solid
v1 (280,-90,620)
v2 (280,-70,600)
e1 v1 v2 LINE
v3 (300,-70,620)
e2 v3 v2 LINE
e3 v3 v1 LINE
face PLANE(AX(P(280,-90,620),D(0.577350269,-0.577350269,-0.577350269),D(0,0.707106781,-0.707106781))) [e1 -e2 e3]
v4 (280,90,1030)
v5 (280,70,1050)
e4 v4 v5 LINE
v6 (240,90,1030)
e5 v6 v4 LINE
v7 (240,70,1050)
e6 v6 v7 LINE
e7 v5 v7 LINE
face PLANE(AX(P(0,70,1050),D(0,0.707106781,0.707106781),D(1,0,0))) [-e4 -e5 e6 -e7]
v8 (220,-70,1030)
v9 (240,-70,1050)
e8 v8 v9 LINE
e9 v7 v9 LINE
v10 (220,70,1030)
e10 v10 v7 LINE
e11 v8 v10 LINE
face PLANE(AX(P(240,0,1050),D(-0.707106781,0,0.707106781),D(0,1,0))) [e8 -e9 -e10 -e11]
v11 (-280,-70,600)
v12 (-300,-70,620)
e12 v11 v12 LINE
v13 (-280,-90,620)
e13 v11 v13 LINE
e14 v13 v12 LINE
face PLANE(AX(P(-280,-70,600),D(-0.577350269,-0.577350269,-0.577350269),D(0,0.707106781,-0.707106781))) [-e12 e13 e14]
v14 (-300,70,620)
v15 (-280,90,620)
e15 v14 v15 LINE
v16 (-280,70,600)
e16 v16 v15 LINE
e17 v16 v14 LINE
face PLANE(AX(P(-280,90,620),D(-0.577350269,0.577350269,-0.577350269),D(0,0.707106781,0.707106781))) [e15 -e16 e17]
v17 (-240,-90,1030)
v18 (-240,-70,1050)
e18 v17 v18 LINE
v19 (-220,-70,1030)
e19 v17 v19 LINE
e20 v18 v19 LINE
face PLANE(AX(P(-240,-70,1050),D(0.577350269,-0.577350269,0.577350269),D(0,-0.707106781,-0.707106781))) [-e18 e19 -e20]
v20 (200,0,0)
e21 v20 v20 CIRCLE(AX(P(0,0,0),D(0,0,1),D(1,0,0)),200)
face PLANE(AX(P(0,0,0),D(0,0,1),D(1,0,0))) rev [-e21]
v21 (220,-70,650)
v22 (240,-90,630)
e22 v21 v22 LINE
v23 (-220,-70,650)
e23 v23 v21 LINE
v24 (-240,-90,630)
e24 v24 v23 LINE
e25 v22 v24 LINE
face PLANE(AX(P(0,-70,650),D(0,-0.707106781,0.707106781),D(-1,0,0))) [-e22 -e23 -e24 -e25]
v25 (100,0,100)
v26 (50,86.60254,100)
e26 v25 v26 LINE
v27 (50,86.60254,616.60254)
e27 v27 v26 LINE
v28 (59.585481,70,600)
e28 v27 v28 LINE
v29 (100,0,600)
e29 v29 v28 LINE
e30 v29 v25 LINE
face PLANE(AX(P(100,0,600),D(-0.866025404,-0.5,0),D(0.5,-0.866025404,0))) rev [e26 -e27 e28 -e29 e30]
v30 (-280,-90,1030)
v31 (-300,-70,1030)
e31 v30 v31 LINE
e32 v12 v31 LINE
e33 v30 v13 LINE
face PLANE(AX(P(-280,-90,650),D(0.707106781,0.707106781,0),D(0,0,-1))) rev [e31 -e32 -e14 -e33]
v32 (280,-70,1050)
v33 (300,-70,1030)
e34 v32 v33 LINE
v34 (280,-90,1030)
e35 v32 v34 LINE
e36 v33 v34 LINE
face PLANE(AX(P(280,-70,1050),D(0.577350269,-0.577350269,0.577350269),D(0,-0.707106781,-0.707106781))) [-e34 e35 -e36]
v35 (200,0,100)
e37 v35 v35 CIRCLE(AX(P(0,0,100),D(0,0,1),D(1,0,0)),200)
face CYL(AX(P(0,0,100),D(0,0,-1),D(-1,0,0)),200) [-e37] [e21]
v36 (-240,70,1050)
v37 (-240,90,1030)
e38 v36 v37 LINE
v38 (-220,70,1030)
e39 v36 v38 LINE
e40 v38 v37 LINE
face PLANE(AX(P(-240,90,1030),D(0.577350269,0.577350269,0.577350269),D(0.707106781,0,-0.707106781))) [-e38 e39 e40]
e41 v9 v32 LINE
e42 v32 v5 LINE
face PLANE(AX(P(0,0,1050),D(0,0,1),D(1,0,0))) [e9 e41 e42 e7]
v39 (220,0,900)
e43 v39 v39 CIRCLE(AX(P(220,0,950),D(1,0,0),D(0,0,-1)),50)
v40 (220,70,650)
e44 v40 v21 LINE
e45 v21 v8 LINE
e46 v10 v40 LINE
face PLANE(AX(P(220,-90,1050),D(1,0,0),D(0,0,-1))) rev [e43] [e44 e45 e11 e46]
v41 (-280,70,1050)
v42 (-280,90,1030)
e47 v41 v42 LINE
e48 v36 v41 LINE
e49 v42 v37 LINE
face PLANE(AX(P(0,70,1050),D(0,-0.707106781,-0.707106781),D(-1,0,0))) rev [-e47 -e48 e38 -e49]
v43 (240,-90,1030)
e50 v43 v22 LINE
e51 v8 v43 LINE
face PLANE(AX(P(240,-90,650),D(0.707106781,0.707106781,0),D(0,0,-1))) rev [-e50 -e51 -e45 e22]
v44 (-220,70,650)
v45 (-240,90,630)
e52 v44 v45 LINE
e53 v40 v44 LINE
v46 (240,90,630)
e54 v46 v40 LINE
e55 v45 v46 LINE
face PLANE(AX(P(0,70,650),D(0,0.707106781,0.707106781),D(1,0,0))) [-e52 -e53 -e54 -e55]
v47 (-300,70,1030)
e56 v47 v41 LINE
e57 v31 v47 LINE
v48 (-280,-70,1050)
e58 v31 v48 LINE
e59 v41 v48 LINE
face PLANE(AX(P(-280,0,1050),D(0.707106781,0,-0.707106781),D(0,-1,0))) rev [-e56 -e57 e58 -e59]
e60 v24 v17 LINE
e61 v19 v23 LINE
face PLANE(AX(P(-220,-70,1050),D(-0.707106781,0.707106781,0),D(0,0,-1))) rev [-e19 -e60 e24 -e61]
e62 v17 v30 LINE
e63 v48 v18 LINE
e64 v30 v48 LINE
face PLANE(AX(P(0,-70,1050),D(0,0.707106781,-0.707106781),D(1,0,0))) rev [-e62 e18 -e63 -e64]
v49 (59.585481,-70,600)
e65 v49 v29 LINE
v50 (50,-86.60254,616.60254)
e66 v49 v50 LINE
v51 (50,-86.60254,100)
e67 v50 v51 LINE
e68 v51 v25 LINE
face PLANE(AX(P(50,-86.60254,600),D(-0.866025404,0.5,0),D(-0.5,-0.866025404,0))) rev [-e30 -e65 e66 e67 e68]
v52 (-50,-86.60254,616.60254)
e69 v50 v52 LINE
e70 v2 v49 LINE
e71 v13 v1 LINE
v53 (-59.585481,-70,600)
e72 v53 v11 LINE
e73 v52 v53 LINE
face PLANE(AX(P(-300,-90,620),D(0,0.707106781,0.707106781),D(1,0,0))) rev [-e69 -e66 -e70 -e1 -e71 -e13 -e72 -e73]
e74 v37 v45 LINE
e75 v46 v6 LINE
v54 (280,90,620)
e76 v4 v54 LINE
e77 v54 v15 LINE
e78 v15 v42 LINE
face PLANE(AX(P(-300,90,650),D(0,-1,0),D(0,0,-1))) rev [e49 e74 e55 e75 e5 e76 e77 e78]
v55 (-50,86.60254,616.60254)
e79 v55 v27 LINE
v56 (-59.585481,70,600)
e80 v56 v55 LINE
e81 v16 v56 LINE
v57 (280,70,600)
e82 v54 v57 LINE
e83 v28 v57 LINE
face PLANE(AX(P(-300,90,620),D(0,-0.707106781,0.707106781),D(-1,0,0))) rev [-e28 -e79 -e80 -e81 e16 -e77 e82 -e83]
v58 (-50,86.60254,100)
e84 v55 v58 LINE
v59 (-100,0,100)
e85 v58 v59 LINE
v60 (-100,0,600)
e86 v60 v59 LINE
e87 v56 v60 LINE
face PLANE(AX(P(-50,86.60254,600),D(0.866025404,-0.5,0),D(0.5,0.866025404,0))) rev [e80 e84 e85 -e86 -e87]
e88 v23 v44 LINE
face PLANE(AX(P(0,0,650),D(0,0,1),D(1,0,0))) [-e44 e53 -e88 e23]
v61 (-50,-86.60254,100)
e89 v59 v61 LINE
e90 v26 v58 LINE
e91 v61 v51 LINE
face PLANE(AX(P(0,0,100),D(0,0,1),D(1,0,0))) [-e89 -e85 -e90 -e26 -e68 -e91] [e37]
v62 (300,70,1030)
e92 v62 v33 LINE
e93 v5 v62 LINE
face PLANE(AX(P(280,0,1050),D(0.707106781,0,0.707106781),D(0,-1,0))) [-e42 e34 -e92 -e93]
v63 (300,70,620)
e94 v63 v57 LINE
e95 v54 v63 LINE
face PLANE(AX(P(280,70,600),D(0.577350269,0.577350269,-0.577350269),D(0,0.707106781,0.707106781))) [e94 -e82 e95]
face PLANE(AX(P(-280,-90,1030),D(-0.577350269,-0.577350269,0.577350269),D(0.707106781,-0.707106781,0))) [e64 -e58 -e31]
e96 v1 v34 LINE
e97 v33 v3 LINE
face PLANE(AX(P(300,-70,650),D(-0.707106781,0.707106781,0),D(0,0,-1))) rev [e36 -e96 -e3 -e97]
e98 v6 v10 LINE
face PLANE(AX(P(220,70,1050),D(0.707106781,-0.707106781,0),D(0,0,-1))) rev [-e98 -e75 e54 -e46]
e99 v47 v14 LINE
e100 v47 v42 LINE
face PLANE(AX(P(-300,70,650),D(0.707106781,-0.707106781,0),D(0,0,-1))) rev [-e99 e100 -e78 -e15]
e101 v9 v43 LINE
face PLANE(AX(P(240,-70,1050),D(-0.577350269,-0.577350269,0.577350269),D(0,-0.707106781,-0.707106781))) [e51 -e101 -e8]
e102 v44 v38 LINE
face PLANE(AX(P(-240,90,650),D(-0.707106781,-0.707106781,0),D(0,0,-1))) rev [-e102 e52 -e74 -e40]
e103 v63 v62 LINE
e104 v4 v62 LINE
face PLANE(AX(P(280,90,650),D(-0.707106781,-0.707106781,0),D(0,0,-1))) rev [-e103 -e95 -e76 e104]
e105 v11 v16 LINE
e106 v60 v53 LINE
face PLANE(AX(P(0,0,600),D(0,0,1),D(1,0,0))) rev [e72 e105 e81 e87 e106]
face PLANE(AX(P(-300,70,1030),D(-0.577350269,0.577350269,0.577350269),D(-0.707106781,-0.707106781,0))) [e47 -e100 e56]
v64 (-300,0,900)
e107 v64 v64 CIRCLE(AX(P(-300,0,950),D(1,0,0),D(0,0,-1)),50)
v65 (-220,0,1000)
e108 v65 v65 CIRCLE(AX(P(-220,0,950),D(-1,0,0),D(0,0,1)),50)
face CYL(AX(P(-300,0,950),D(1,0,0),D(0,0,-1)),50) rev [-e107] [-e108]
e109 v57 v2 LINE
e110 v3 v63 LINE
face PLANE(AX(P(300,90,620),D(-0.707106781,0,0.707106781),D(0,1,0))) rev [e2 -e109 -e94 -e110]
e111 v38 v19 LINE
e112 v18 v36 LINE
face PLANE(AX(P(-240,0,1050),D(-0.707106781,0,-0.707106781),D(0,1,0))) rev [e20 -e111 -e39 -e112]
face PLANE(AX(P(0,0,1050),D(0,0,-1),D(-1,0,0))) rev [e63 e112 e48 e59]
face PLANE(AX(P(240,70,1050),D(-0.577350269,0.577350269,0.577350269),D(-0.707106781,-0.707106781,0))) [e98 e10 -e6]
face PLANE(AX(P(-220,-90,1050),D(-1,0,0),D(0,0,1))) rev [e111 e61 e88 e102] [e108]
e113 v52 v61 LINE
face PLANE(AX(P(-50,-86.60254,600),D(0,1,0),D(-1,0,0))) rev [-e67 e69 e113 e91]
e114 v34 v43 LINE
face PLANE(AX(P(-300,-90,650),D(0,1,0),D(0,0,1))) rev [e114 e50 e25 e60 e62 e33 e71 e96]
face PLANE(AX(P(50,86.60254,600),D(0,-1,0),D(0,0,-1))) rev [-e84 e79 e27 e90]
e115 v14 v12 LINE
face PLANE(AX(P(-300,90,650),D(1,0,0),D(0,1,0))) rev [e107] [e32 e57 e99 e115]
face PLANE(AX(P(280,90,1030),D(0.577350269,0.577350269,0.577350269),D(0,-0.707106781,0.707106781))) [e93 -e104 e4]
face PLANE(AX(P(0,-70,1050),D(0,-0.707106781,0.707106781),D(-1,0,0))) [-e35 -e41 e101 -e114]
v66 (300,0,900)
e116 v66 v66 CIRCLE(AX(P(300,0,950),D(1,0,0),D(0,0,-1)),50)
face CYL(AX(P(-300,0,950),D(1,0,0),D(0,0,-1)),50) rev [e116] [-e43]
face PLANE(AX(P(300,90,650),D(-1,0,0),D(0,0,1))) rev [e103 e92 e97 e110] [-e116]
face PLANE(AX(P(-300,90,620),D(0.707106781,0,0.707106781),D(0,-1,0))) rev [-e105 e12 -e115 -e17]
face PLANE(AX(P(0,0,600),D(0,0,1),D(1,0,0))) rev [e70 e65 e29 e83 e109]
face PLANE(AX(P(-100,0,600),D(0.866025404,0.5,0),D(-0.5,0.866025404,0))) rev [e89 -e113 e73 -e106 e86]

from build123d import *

# Parameters (mm, degrees)
CROQUIS1_R              = 200
SALIENTE_EXTRUIR1_DEPTH = 100
SALIENTE_EXTRUIR2_DEPTH = 500
CROQUIS3_W              = 600
CROQUIS3_H              = 180
SALIENTE_EXTRUIR3_DEPTH = 50
CROQUIS4_W              = 80
CROQUIS4_H              = 180
SALIENTE_EXTRUIR4_DEPTH = 400
CROQUIS5_R              = 50
CORTAR_EXTRUIR1_DEPTH   = 1226.765067213


with BuildPart() as part:
    # Croquis1 → Saliente-Extruir1 (new body)
    with BuildSketch(Plane.XY):
        Circle(CROQUIS1_R)
    extrude(amount=SALIENTE_EXTRUIR1_DEPTH)

    # Croquis2 → Saliente-Extruir2 (add)
    with BuildSketch(Plane.XY.offset(100)):
        Polygon((100, 0), (50, 86.602540378), (-50, 86.602540378), (-100, 0), (-50, -86.602540378), (50, -86.602540378), align=None)
    extrude(amount=SALIENTE_EXTRUIR2_DEPTH)

    # Croquis3 → Saliente-Extruir3 (add)
    with BuildSketch(Plane.XY.offset(600)):
        Rectangle(CROQUIS3_W, CROQUIS3_H)
    extrude(amount=SALIENTE_EXTRUIR3_DEPTH)

    # Croquis4 → Saliente-Extruir4 (add)
    with BuildSketch(Plane.XY.offset(650)):
        with Locations((-260, 0)):
            Rectangle(CROQUIS4_W, CROQUIS4_H)
        with Locations((260, 0)):
            Rectangle(CROQUIS4_W, CROQUIS4_H)
    extrude(amount=SALIENTE_EXTRUIR4_DEPTH)

    # Chaflán1
    # the kernel refuses this chamfer: 20 mm, written as the material it takes off along each edge
    with BuildSketch(Plane(origin=(-233.333333333, 76.666666667, 1036.666666667), x_dir=(0.7071067811865475, -0.7071067811865475, 0), z_dir=(0.5773502691896257, 0.5773502691896257, 0.5773502691896257)), Plane(origin=(-286.666666667, 76.666666667, 1036.666666667), x_dir=(0, -0.7071067811865475, 0.7071067811865475), z_dir=(-0.577350269189627, 0.5773502691896253, 0.5773502691896253)), Plane(origin=(-286.666666667, -76.666666667, 613.333333333), x_dir=(-0.7071067811865475, 0, 0.7071067811865475), z_dir=(-0.5773502691896257, -0.5773502691896257, -0.5773502691896257)), Plane(origin=(286.666666667, 76.666666667, 1036.666666667), x_dir=(0.7071067811865466, -0.7071067811865486, 0), z_dir=(0.5773502691896264, 0.5773502691896247, 0.5773502691896264)), Plane(origin=(286.666666667, 76.666666667, 613.333333333), x_dir=(-2.009718347115232e-15, -0.7071067811865475, -0.7071067811865475), z_dir=(0.5773502691896264, 0.5773502691896247, -0.5773502691896264)), Plane(origin=(286.666666667, -76.666666667, 613.333333333), x_dir=(0, -0.7071067811865475, 0.7071067811865475), z_dir=(0.5773502691896257, -0.5773502691896257, -0.5773502691896257)), Plane(origin=(233.333333333, 76.666666667, 1036.666666667), x_dir=(1.004859173557616e-15, -0.7071067811865475, 0.7071067811865475), z_dir=(-0.5773502691896263, 0.5773502691896251, 0.5773502691896258))) as chafl_n1_piece_1:
        Polygon((-14.142135624, 8.164965809), (14.142135624, 8.164965809), (0, -16.329931619), align=None)
    extrude(amount=25.403411844, mode=Mode.SUBTRACT)
    with BuildSketch(Plane(origin=(233.333333333, -76.666666667, 1036.666666667), x_dir=(0, 0.7071067811865472, 0.7071067811865478), z_dir=(-0.5773502691896256, -0.5773502691896261, 0.5773502691896256)), Plane(origin=(-233.333333333, -76.666666667, 1036.666666667), x_dir=(-0.7071067811865475, 0, 0.7071067811865475), z_dir=(0.5773502691896255, -0.5773502691896263, 0.5773502691896255)), Plane(origin=(-286.666666667, 76.666666667, 613.333333333), x_dir=(0, -0.7071067811865475, -0.7071067811865475), z_dir=(-0.5773502691896257, 0.5773502691896257, -0.5773502691896257)), Plane(origin=(-286.666666667, -76.666666667, 1036.666666667), x_dir=(-0.7071067811865475, 0, -0.7071067811865475), z_dir=(-0.5773502691896257, -0.5773502691896257, 0.5773502691896257)), Plane(origin=(286.666666667, -76.666666667, 1036.666666667), x_dir=(0.7071067811865475, 0.7071067811865475, 0), z_dir=(0.5773502691896257, -0.5773502691896257, 0.5773502691896257))) as chafl_n1_piece_2:
        Polygon((-14.142135624, -8.164965809), (14.142135624, -8.164965809), (0, 16.329931619), align=None)
    extrude(amount=25.403411844, mode=Mode.SUBTRACT)
    with BuildSketch(Plane(origin=(-220, 90, 650), x_dir=(-0.9996219169112968, 0.027495876610586317, 0), z_dir=(0, 0, 1)), Plane(origin=(220, -90, 650), x_dir=(0.9996219169112968, -0.027495876610585626, 0), z_dir=(0, 0, 1))) as chafl_n1_piece_3:
        with BuildLine():
            Line((20.573463904, 0), (-1.130943098, 20.54235587))
            Line((-1.130943098, 20.54235587), (-1.530791864, 20.53135752))
            ThreePointArc((-1.530791864, 20.53135752), (-0.682584541, 10.267956593), (-0.399848767, -0.010998351))
            Line((-0.399848767, -0.010998351), (0.010998351, -0.399848767))
            ThreePointArc((0.010998351, -0.399848767), (10.289953294, -0.117112992), (20.584462254, -0.399848767))
            Line((20.584462254, -0.399848767), (20.573463904, 0))
        make_face()
    extrude(amount=451.433659759, mode=Mode.SUBTRACT)
    with BuildSketch(Plane(origin=(-220, -90, 650), x_dir=(-0.9996219169112968, -0.027495876610586282, 0), z_dir=(0, 0, 1)), Plane(origin=(220, 90, 650), x_dir=(0.9996219169112968, 0.027495876610586355, 0), z_dir=(0, 0, 1))) as chafl_n1_piece_4:
        with BuildLine():
            Line((20.573463904, 0), (-1.130943098, -20.54235587))
            Line((-1.130943098, -20.54235587), (-1.530791864, -20.53135752))
            ThreePointArc((-1.530791864, -20.53135752), (-0.682584541, -10.267956593), (-0.399848767, 0.010998351))
            Line((-0.399848767, 0.010998351), (0.010998351, 0.399848767))
            ThreePointArc((0.010998351, 0.399848767), (10.289953294, 0.117112992), (20.584462254, 0.399848767))
            Line((20.584462254, 0.399848767), (20.573463904, 0))
        make_face()
    extrude(amount=451.433659759, mode=Mode.SUBTRACT)
    with BuildSketch(Plane(origin=(-300, 90, 548.566340241), x_dir=(0.9996219169112968, 0.027495876610586282, 0), z_dir=(0, 0, 1)), Plane(origin=(300, 90, 1101.433659759), x_dir=(-0.9996219169112968, 0.027495876610586282, 0), z_dir=(0, 0, -1))) as chafl_n1_piece_5:
        with BuildLine():
            Line((20.573463904, 0), (-1.130943098, -20.54235587))
            Line((-1.130943098, -20.54235587), (-1.530791864, -20.53135752))
            ThreePointArc((-1.530791864, -20.53135752), (-0.682584541, -10.267956593), (-0.399848767, 0.010998351))
            Line((-0.399848767, 0.010998351), (0.010998351, 0.399848767))
            ThreePointArc((0.010998351, 0.399848767), (10.289953294, 0.117112992), (20.584462254, 0.399848767))
            Line((20.584462254, 0.399848767), (20.573463904, 0))
        make_face()
    extrude(amount=552.867319519, mode=Mode.SUBTRACT)
    with BuildSketch(Plane(origin=(-300, -90, 548.566340241), x_dir=(0.9996219169112968, -0.027495876610586282, 0), z_dir=(0, 0, 1)), Plane(origin=(300, -90, 1101.433659759), x_dir=(-0.9996219169112968, -0.027495876610586282, 0), z_dir=(0, 0, -1))) as chafl_n1_piece_6:
        with BuildLine():
            Line((20.573463904, 0), (-1.130943098, 20.54235587))
            Line((-1.130943098, 20.54235587), (-1.530791864, 20.53135752))
            ThreePointArc((-1.530791864, 20.53135752), (-0.682584541, 10.267956593), (-0.399848767, -0.010998351))
            Line((-0.399848767, -0.010998351), (0.010998351, -0.399848767))
            ThreePointArc((0.010998351, -0.399848767), (10.289953294, -0.117112992), (20.584462254, -0.399848767))
            Line((20.584462254, -0.399848767), (20.573463904, 0))
        make_face()
    extrude(amount=552.867319519, mode=Mode.SUBTRACT)
    with BuildSketch(Plane(origin=(-351.433659759, -90, 1050), x_dir=(0, -0.02749587661058643, -0.9996219169112968), z_dir=(1, 0, 0)), Plane(origin=(-168.566340241, 90, 1050), x_dir=(0, 0.02749587661058643, -0.9996219169112968), z_dir=(-1, 0, 0))) as chafl_n1_piece_7:
        with BuildLine():
            Line((20.573463904, 0), (-1.130943098, 20.54235587))
            Line((-1.130943098, 20.54235587), (-1.530791864, 20.53135752))
            ThreePointArc((-1.530791864, 20.53135752), (-0.682584541, 10.267956593), (-0.399848767, -0.010998351))
            Line((-0.399848767, -0.010998351), (0.010998351, -0.399848767))
            ThreePointArc((0.010998351, -0.399848767), (10.289953294, -0.117112992), (20.584462254, -0.399848767))
            Line((20.584462254, -0.399848767), (20.573463904, 0))
        make_face()
    extrude(amount=182.867319519, mode=Mode.SUBTRACT)
    with BuildSketch(Plane(origin=(-220, -141.433659759, 1050), x_dir=(0.02749587661058643, 0, -0.9996219169112968), z_dir=(0, 1, 0)), Plane(origin=(220, -141.433659759, 1050), x_dir=(0.9996219169112969, 0, 0.027495876610582178), z_dir=(0, 1, 0))) as chafl_n1_piece_8:
        with BuildLine():
            Line((20.573463904, 0), (-1.130943098, 20.54235587))
            Line((-1.130943098, 20.54235587), (-1.530791864, 20.53135752))
            ThreePointArc((-1.530791864, 20.53135752), (-0.682584541, 10.267956593), (-0.399848767, -0.010998351))
            Line((-0.399848767, -0.010998351), (0.010998351, -0.399848767))
            ThreePointArc((0.010998351, -0.399848767), (10.289953294, -0.117112992), (20.584462254, -0.399848767))
            Line((20.584462254, -0.399848767), (20.573463904, 0))
        make_face()
    extrude(amount=282.867319519, mode=Mode.SUBTRACT)
    with BuildSketch(Plane(origin=(-300, 141.433659759, 1050), x_dir=(0.9996219169112969, 0, 0.02749587661058214), z_dir=(0, -1, 0)), Plane(origin=(300, 141.433659759, 1050), x_dir=(0.027495876610587815, 0, -0.9996219169112968), z_dir=(0, -1, 0)), Plane(origin=(-300, -141.433659759, 600), x_dir=(0.9996219169112968, 0, -0.027495876610587663), z_dir=(0, 1, 0)), Plane(origin=(300, 141.433659759, 600), x_dir=(-0.9996219169112968, 0, -0.027495876610587663), z_dir=(0, -1, 0))) as chafl_n1_piece_9:
        with BuildLine():
            Line((20.573463904, 0), (-1.130943098, -20.54235587))
            Line((-1.130943098, -20.54235587), (-1.530791864, -20.53135752))
            ThreePointArc((-1.530791864, -20.53135752), (-0.682584541, -10.267956593), (-0.399848767, 0.010998351))
            Line((-0.399848767, 0.010998351), (0.010998351, 0.399848767))
            ThreePointArc((0.010998351, 0.399848767), (10.289953294, 0.117112992), (20.584462254, 0.399848767))
            Line((20.584462254, 0.399848767), (20.573463904, 0))
        make_face()
    extrude(amount=282.867319519, mode=Mode.SUBTRACT)
    with BuildSketch(Plane(origin=(168.566340241, 90, 1050), x_dir=(0, 0.02749587661058643, -0.9996219169112968), z_dir=(1, 0, 0)), Plane(origin=(351.433659759, -90, 1050), x_dir=(0, -0.02749587661058643, -0.9996219169112968), z_dir=(-1, 0, 0))) as chafl_n1_piece_10:
        with BuildLine():
            Line((20.573463904, 0), (-1.130943098, -20.54235587))
            Line((-1.130943098, -20.54235587), (-1.530791864, -20.53135752))
            ThreePointArc((-1.530791864, -20.53135752), (-0.682584541, -10.267956593), (-0.399848767, 0.010998351))
            Line((-0.399848767, 0.010998351), (0.010998351, 0.399848767))
            ThreePointArc((0.010998351, 0.399848767), (10.289953294, 0.117112992), (20.584462254, 0.399848767))
            Line((20.584462254, 0.399848767), (20.573463904, 0))
        make_face()
    extrude(amount=182.867319519, mode=Mode.SUBTRACT)
    with BuildSketch(Plane(origin=(-351.433659759, 90, 600), x_dir=(0, 0.027495876610586282, 0.9996219169112968), z_dir=(1, 0, 0))) as chafl_n1_piece_11_section:
        with BuildLine():
            Line((20.573463904, 0), (-1.130943098, 20.54235587))
            Line((-1.130943098, 20.54235587), (-1.530791864, 20.53135752))
            ThreePointArc((-1.530791864, 20.53135752), (-0.682584541, 10.267956593), (-0.399848767, -0.010998351))
            Line((-0.399848767, -0.010998351), (0.010998351, -0.399848767))
            ThreePointArc((0.010998351, -0.399848767), (10.289953294, -0.117112992), (20.584462254, -0.399848767))
            Line((20.584462254, -0.399848767), (20.573463904, 0))
        make_face()
    chafl_n1_piece_11 = extrude(amount=702.867319519, mode=Mode.PRIVATE)
    chafl_n1_piece_11 = split(chafl_n1_piece_11, bisect_by=Plane(origin=(-86.659672544, 23.106124943, 609.411385689), z_dir=(-0.8660254037844387, 0.5, 0)), keep=Keep.TOP, mode=Mode.PRIVATE)
    chafl_n1_piece_11 = split(chafl_n1_piece_11, bisect_by=Plane(origin=(-200.134238493, 86.602540378, 609.411385689), z_dir=(0, 1, 0)), keep=Keep.TOP, mode=Mode.PRIVATE)
    add(chafl_n1_piece_11, mode=Mode.SUBTRACT)
    with BuildSketch(Plane(origin=(-351.433659759, 90, 600), x_dir=(0, 0.027495876610586282, 0.9996219169112968), z_dir=(1, 0, 0))) as chafl_n1_piece_12_section:
        with BuildLine():
            Line((20.573463904, 0), (-1.130943098, 20.54235587))
            Line((-1.130943098, 20.54235587), (-1.530791864, 20.53135752))
            ThreePointArc((-1.530791864, 20.53135752), (-0.682584541, 10.267956593), (-0.399848767, -0.010998351))
            Line((-0.399848767, -0.010998351), (0.010998351, -0.399848767))
            ThreePointArc((0.010998351, -0.399848767), (10.289953294, -0.117112992), (20.584462254, -0.399848767))
            Line((20.584462254, -0.399848767), (20.573463904, 0))
        make_face()
    chafl_n1_piece_12 = extrude(amount=702.867319519, mode=Mode.PRIVATE)
    chafl_n1_piece_12 = split(chafl_n1_piece_12, bisect_by=Plane(origin=(-90.598996107, 16.283016385, 605.202318191), z_dir=(-0.8660254037844387, 0.5, 0)), keep=Keep.TOP, mode=Mode.PRIVATE)
    chafl_n1_piece_12 = split(chafl_n1_piece_12, bisect_by=Plane(origin=(-202.385280529, 86.602540378, 605.202318191), z_dir=(0, -1, 0)), keep=Keep.TOP, mode=Mode.PRIVATE)
    add(chafl_n1_piece_12, mode=Mode.SUBTRACT)
    with BuildSketch(Plane(origin=(-351.433659759, 90, 600), x_dir=(0, 0.027495876610586282, 0.9996219169112968), z_dir=(1, 0, 0))) as chafl_n1_piece_13_section:
        with BuildLine():
            Line((20.573463904, 0), (-1.130943098, 20.54235587))
            Line((-1.130943098, 20.54235587), (-1.530791864, 20.53135752))
            ThreePointArc((-1.530791864, 20.53135752), (-0.682584541, 10.267956593), (-0.399848767, -0.010998351))
            Line((-0.399848767, -0.010998351), (0.010998351, -0.399848767))
            ThreePointArc((0.010998351, -0.399848767), (10.289953294, -0.117112992), (20.584462254, -0.399848767))
            Line((20.584462254, -0.399848767), (20.573463904, 0))
        make_face()
    chafl_n1_piece_13 = extrude(amount=702.867319519, mode=Mode.PRIVATE)
    chafl_n1_piece_13 = split(chafl_n1_piece_13, bisect_by=Plane(origin=(-36.633682246, 109.753681839, 609.395218204), z_dir=(0.8660254037844387, -0.5, 0)), keep=Keep.TOP, mode=Mode.PRIVATE)
    chafl_n1_piece_13 = split(chafl_n1_piece_13, bisect_by=Plane(origin=(0, 86.602540378, 609.395218204), z_dir=(0, 1, 0)), keep=Keep.TOP, mode=Mode.PRIVATE)
    chafl_n1_piece_13 = split(chafl_n1_piece_13, bisect_by=Plane(origin=(36.633682246, 109.753681839, 609.395218204), z_dir=(-0.8660254037844387, -0.5000000000000001, 0)), keep=Keep.TOP, mode=Mode.PRIVATE)
    add(chafl_n1_piece_13, mode=Mode.SUBTRACT)
    with BuildSketch(Plane(origin=(-351.433659759, 90, 600), x_dir=(0, 0.027495876610586282, 0.9996219169112968), z_dir=(1, 0, 0))) as chafl_n1_piece_14_section:
        with BuildLine():
            Line((20.573463904, 0), (-1.130943098, 20.54235587))
            Line((-1.130943098, 20.54235587), (-1.530791864, 20.53135752))
            ThreePointArc((-1.530791864, 20.53135752), (-0.682584541, 10.267956593), (-0.399848767, -0.010998351))
            Line((-0.399848767, -0.010998351), (0.010998351, -0.399848767))
            ThreePointArc((0.010998351, -0.399848767), (10.289953294, -0.117112992), (20.584462254, -0.399848767))
            Line((20.584462254, -0.399848767), (20.573463904, 0))
        make_face()
    chafl_n1_piece_14 = extrude(amount=702.867319519, mode=Mode.PRIVATE)
    chafl_n1_piece_14 = split(chafl_n1_piece_14, bisect_by=Plane(origin=(200.134238493, 86.602540378, 609.411385689), z_dir=(0, 1, 0)), keep=Keep.TOP, mode=Mode.PRIVATE)
    chafl_n1_piece_14 = split(chafl_n1_piece_14, bisect_by=Plane(origin=(86.659672544, 23.106124943, 609.411385689), z_dir=(0.8660254037844387, 0.5000000000000001, 0)), keep=Keep.TOP, mode=Mode.PRIVATE)
    add(chafl_n1_piece_14, mode=Mode.SUBTRACT)
    with BuildSketch(Plane(origin=(-351.433659759, 90, 600), x_dir=(0, 0.027495876610586282, 0.9996219169112968), z_dir=(1, 0, 0))) as chafl_n1_piece_15_section:
        with BuildLine():
            Line((20.573463904, 0), (-1.130943098, 20.54235587))
            Line((-1.130943098, 20.54235587), (-1.530791864, 20.53135752))
            ThreePointArc((-1.530791864, 20.53135752), (-0.682584541, 10.267956593), (-0.399848767, -0.010998351))
            Line((-0.399848767, -0.010998351), (0.010998351, -0.399848767))
            ThreePointArc((0.010998351, -0.399848767), (10.289953294, -0.117112992), (20.584462254, -0.399848767))
            Line((20.584462254, -0.399848767), (20.573463904, 0))
        make_face()
    chafl_n1_piece_15 = extrude(amount=702.867319519, mode=Mode.PRIVATE)
    chafl_n1_piece_15 = split(chafl_n1_piece_15, bisect_by=Plane(origin=(202.385280529, 86.602540378, 605.202318191), z_dir=(0, -1, 0)), keep=Keep.TOP, mode=Mode.PRIVATE)
    chafl_n1_piece_15 = split(chafl_n1_piece_15, bisect_by=Plane(origin=(90.598996107, 16.283016385, 605.202318191), z_dir=(0.8660254037844387, 0.5000000000000001, 0)), keep=Keep.TOP, mode=Mode.PRIVATE)
    add(chafl_n1_piece_15, mode=Mode.SUBTRACT)
    with BuildSketch(Plane(origin=(351.433659759, -90, 600), x_dir=(0, 0.9996219169112968, -0.0274958766105877), z_dir=(-1, 0, 0))) as chafl_n1_piece_16_section:
        with BuildLine():
            Line((20.573463904, 0), (-1.130943098, -20.54235587))
            Line((-1.130943098, -20.54235587), (-1.530791864, -20.53135752))
            ThreePointArc((-1.530791864, -20.53135752), (-0.682584541, -10.267956593), (-0.399848767, 0.010998351))
            Line((-0.399848767, 0.010998351), (0.010998351, 0.399848767))
            ThreePointArc((0.010998351, 0.399848767), (10.289953294, 0.117112992), (20.584462254, 0.399848767))
            Line((20.584462254, 0.399848767), (20.573463904, 0))
        make_face()
    chafl_n1_piece_16 = extrude(amount=702.867319519, mode=Mode.PRIVATE)
    chafl_n1_piece_16 = split(chafl_n1_piece_16, bisect_by=Plane(origin=(90.598996107, -16.283016385, 605.202318191), z_dir=(0.8660254037844389, -0.49999999999999956, 0)), keep=Keep.TOP, mode=Mode.PRIVATE)
    chafl_n1_piece_16 = split(chafl_n1_piece_16, bisect_by=Plane(origin=(202.385280529, -86.602540378, 605.202318191), z_dir=(0, 1, 0)), keep=Keep.TOP, mode=Mode.PRIVATE)
    add(chafl_n1_piece_16, mode=Mode.SUBTRACT)
    with BuildSketch(Plane(origin=(351.433659759, -90, 600), x_dir=(0, 0.9996219169112968, -0.0274958766105877), z_dir=(-1, 0, 0))) as chafl_n1_piece_17_section:
        with BuildLine():
            Line((20.573463904, 0), (-1.130943098, -20.54235587))
            Line((-1.130943098, -20.54235587), (-1.530791864, -20.53135752))
            ThreePointArc((-1.530791864, -20.53135752), (-0.682584541, -10.267956593), (-0.399848767, 0.010998351))
            Line((-0.399848767, 0.010998351), (0.010998351, 0.399848767))
            ThreePointArc((0.010998351, 0.399848767), (10.289953294, 0.117112992), (20.584462254, 0.399848767))
            Line((20.584462254, 0.399848767), (20.573463904, 0))
        make_face()
    chafl_n1_piece_17 = extrude(amount=702.867319519, mode=Mode.PRIVATE)
    chafl_n1_piece_17 = split(chafl_n1_piece_17, bisect_by=Plane(origin=(86.659672544, -23.106124943, 609.411385689), z_dir=(0.8660254037844389, -0.49999999999999956, 0)), keep=Keep.TOP, mode=Mode.PRIVATE)
    chafl_n1_piece_17 = split(chafl_n1_piece_17, bisect_by=Plane(origin=(200.134238493, -86.602540378, 609.411385689), z_dir=(0, -1, 0)), keep=Keep.TOP, mode=Mode.PRIVATE)
    add(chafl_n1_piece_17, mode=Mode.SUBTRACT)
    with BuildSketch(Plane(origin=(351.433659759, -90, 600), x_dir=(0, 0.9996219169112968, -0.0274958766105877), z_dir=(-1, 0, 0))) as chafl_n1_piece_18_section:
        with BuildLine():
            Line((20.573463904, 0), (-1.130943098, -20.54235587))
            Line((-1.130943098, -20.54235587), (-1.530791864, -20.53135752))
            ThreePointArc((-1.530791864, -20.53135752), (-0.682584541, -10.267956593), (-0.399848767, 0.010998351))
            Line((-0.399848767, 0.010998351), (0.010998351, 0.399848767))
            ThreePointArc((0.010998351, 0.399848767), (10.289953294, 0.117112992), (20.584462254, 0.399848767))
            Line((20.584462254, 0.399848767), (20.573463904, 0))
        make_face()
    chafl_n1_piece_18 = extrude(amount=702.867319519, mode=Mode.PRIVATE)
    chafl_n1_piece_18 = split(chafl_n1_piece_18, bisect_by=Plane(origin=(36.633682246, -109.753681839, 609.395218204), z_dir=(-0.8660254037844389, 0.49999999999999956, 0)), keep=Keep.TOP, mode=Mode.PRIVATE)
    chafl_n1_piece_18 = split(chafl_n1_piece_18, bisect_by=Plane(origin=(0, -86.602540378, 609.395218204), z_dir=(0, -1, 0)), keep=Keep.TOP, mode=Mode.PRIVATE)
    chafl_n1_piece_18 = split(chafl_n1_piece_18, bisect_by=Plane(origin=(-36.633682246, -109.753681839, 609.395218204), z_dir=(0.8660254037844387, 0.5000000000000001, 0)), keep=Keep.TOP, mode=Mode.PRIVATE)
    add(chafl_n1_piece_18, mode=Mode.SUBTRACT)
    with BuildSketch(Plane(origin=(351.433659759, -90, 600), x_dir=(0, 0.9996219169112968, -0.0274958766105877), z_dir=(-1, 0, 0))) as chafl_n1_piece_19_section:
        with BuildLine():
            Line((20.573463904, 0), (-1.130943098, -20.54235587))
            Line((-1.130943098, -20.54235587), (-1.530791864, -20.53135752))
            ThreePointArc((-1.530791864, -20.53135752), (-0.682584541, -10.267956593), (-0.399848767, 0.010998351))
            Line((-0.399848767, 0.010998351), (0.010998351, 0.399848767))
            ThreePointArc((0.010998351, 0.399848767), (10.289953294, 0.117112992), (20.584462254, 0.399848767))
            Line((20.584462254, 0.399848767), (20.573463904, 0))
        make_face()
    chafl_n1_piece_19 = extrude(amount=702.867319519, mode=Mode.PRIVATE)
    chafl_n1_piece_19 = split(chafl_n1_piece_19, bisect_by=Plane(origin=(-202.385280529, -86.602540378, 605.202318191), z_dir=(0, 1, 0)), keep=Keep.TOP, mode=Mode.PRIVATE)
    chafl_n1_piece_19 = split(chafl_n1_piece_19, bisect_by=Plane(origin=(-90.598996107, -16.283016385, 605.202318191), z_dir=(-0.8660254037844387, -0.5000000000000001, 0)), keep=Keep.TOP, mode=Mode.PRIVATE)
    add(chafl_n1_piece_19, mode=Mode.SUBTRACT)
    with BuildSketch(Plane(origin=(351.433659759, -90, 600), x_dir=(0, 0.9996219169112968, -0.0274958766105877), z_dir=(-1, 0, 0))) as chafl_n1_piece_20_section:
        with BuildLine():
            Line((20.573463904, 0), (-1.130943098, -20.54235587))
            Line((-1.130943098, -20.54235587), (-1.530791864, -20.53135752))
            ThreePointArc((-1.530791864, -20.53135752), (-0.682584541, -10.267956593), (-0.399848767, 0.010998351))
            Line((-0.399848767, 0.010998351), (0.010998351, 0.399848767))
            ThreePointArc((0.010998351, 0.399848767), (10.289953294, 0.117112992), (20.584462254, 0.399848767))
            Line((20.584462254, 0.399848767), (20.573463904, 0))
        make_face()
    chafl_n1_piece_20 = extrude(amount=702.867319519, mode=Mode.PRIVATE)
    chafl_n1_piece_20 = split(chafl_n1_piece_20, bisect_by=Plane(origin=(-200.134238493, -86.602540378, 609.411385689), z_dir=(0, -1, 0)), keep=Keep.TOP, mode=Mode.PRIVATE)
    chafl_n1_piece_20 = split(chafl_n1_piece_20, bisect_by=Plane(origin=(-86.659672544, -23.106124943, 609.411385689), z_dir=(-0.8660254037844387, -0.5000000000000001, 0)), keep=Keep.TOP, mode=Mode.PRIVATE)
    add(chafl_n1_piece_20, mode=Mode.SUBTRACT)
    with BuildSketch(Plane(origin=(-220, 90, 650), x_dir=(0, 0.027495876610586282, -0.9996219169112968), z_dir=(1, 0, 0)), Plane(origin=(220, -90, 650), x_dir=(0, -0.027495876610586282, -0.9996219169112968), z_dir=(-1, 0, 0))) as chafl_n1_piece_21:
        with BuildLine():
            Line((20.573463904, 0), (-1.130943098, -20.54235587))
            Line((-1.130943098, -20.54235587), (-1.530791864, -20.53135752))
            ThreePointArc((-1.530791864, -20.53135752), (-0.682584541, -10.267956593), (-0.399848767, 0.010998351))
            Line((-0.399848767, 0.010998351), (0.010998351, 0.399848767))
            ThreePointArc((0.010998351, 0.399848767), (10.289953294, 0.117112992), (20.584462254, 0.399848767))
            Line((20.584462254, 0.399848767), (20.573463904, 0))
        make_face()
    extrude(amount=440, mode=Mode.SUBTRACT)
    with BuildSketch(Plane(origin=(-220, 90, 598.566340241), x_dir=(-0.9996219169112968, 0.027495876610586317, 0), z_dir=(0, 0, 1))) as chafl_n1_piece_22a_section:
        with BuildLine():
            Line((20.573463904, 0), (-1.130943098, 20.54235587))
            Line((-1.130943098, 20.54235587), (-1.530791864, 20.53135752))
            ThreePointArc((-1.530791864, 20.53135752), (-0.682584541, 10.267956593), (-0.399848767, -0.010998351))
            Line((-0.399848767, -0.010998351), (0.010998351, -0.399848767))
            ThreePointArc((0.010998351, -0.399848767), (10.289953294, -0.117112992), (20.584462254, -0.399848767))
            Line((20.584462254, -0.399848767), (20.573463904, 0))
        make_face()
    chafl_n1_piece_22a = extrude(amount=502.867319519, mode=Mode.PRIVATE)
    chafl_n1_piece_22a = split(chafl_n1_piece_22a, bisect_by=Plane(origin=(-226.595872536, 83.404127464, 650), z_dir=(0, 0, -1)), keep=Keep.TOP, mode=Mode.PRIVATE)
    with BuildSketch(Plane(origin=(-271.433659759, 90, 650), x_dir=(0, 0.027495876610586282, -0.9996219169112968), z_dir=(1, 0, 0))) as chafl_n1_piece_22b_section:
        with BuildLine():
            Line((20.573463904, 0), (-1.130943098, -20.54235587))
            Line((-1.130943098, -20.54235587), (-1.530791864, -20.53135752))
            ThreePointArc((-1.530791864, -20.53135752), (-0.682584541, -10.267956593), (-0.399848767, 0.010998351))
            Line((-0.399848767, 0.010998351), (0.010998351, 0.399848767))
            ThreePointArc((0.010998351, 0.399848767), (10.289953294, 0.117112992), (20.584462254, 0.399848767))
            Line((20.584462254, 0.399848767), (20.573463904, 0))
        make_face()
    chafl_n1_piece_22b = extrude(amount=491.433659759, mode=Mode.PRIVATE)
    chafl_n1_piece_22b = split(chafl_n1_piece_22b, bisect_by=Plane(origin=(-220, 83.404127464, 643.404127464), z_dir=(-1, 0, 0)), keep=Keep.TOP, mode=Mode.PRIVATE)
    chafl_n1_piece_22 = chafl_n1_piece_22a & chafl_n1_piece_22b
    add(chafl_n1_piece_22, mode=Mode.SUBTRACT)
    with BuildSketch(Plane(origin=(220, -90, 598.566340241), x_dir=(0.9996219169112968, -0.027495876610586317, 0), z_dir=(0, 0, 1))) as chafl_n1_piece_23a_section:
        with BuildLine():
            Line((20.573463904, 0), (-1.130943098, 20.54235587))
            Line((-1.130943098, 20.54235587), (-1.530791864, 20.53135752))
            ThreePointArc((-1.530791864, 20.53135752), (-0.682584541, 10.267956593), (-0.399848767, -0.010998351))
            Line((-0.399848767, -0.010998351), (0.010998351, -0.399848767))
            ThreePointArc((0.010998351, -0.399848767), (10.289953294, -0.117112992), (20.584462254, -0.399848767))
            Line((20.584462254, -0.399848767), (20.573463904, 0))
        make_face()
    chafl_n1_piece_23a = extrude(amount=502.867319519, mode=Mode.PRIVATE)
    chafl_n1_piece_23a = split(chafl_n1_piece_23a, bisect_by=Plane(origin=(226.595872536, -83.404127464, 650), z_dir=(0, 0, -1)), keep=Keep.TOP, mode=Mode.PRIVATE)
    with BuildSketch(Plane(origin=(271.433659759, -90, 650), x_dir=(0, -0.027495876610586282, -0.9996219169112968), z_dir=(-1, 0, 0))) as chafl_n1_piece_23b_section:
        with BuildLine():
            Line((20.573463904, 0), (-1.130943098, -20.54235587))
            Line((-1.130943098, -20.54235587), (-1.530791864, -20.53135752))
            ThreePointArc((-1.530791864, -20.53135752), (-0.682584541, -10.267956593), (-0.399848767, 0.010998351))
            Line((-0.399848767, 0.010998351), (0.010998351, 0.399848767))
            ThreePointArc((0.010998351, 0.399848767), (10.289953294, 0.117112992), (20.584462254, 0.399848767))
            Line((20.584462254, 0.399848767), (20.573463904, 0))
        make_face()
    chafl_n1_piece_23b = extrude(amount=491.433659759, mode=Mode.PRIVATE)
    chafl_n1_piece_23b = split(chafl_n1_piece_23b, bisect_by=Plane(origin=(220, -83.404127464, 643.404127464), z_dir=(1, 0, 0)), keep=Keep.TOP, mode=Mode.PRIVATE)
    chafl_n1_piece_23 = chafl_n1_piece_23a & chafl_n1_piece_23b
    add(chafl_n1_piece_23, mode=Mode.SUBTRACT)
    with BuildSketch(Plane(origin=(220, -90, 650), x_dir=(0, -0.027495876610586282, -0.9996219169112968), z_dir=(-1, 0, 0))) as chafl_n1_piece_24a_section:
        with BuildLine():
            Line((20.573463904, 0), (-1.130943098, -20.54235587))
            Line((-1.130943098, -20.54235587), (-1.530791864, -20.53135752))
            ThreePointArc((-1.530791864, -20.53135752), (-0.682584541, -10.267956593), (-0.399848767, 0.010998351))
            Line((-0.399848767, 0.010998351), (0.010998351, 0.399848767))
            ThreePointArc((0.010998351, 0.399848767), (10.289953294, 0.117112992), (20.584462254, 0.399848767))
            Line((20.584462254, 0.399848767), (20.573463904, 0))
        make_face()
    chafl_n1_piece_24a = extrude(amount=491.433659759, mode=Mode.PRIVATE)
    chafl_n1_piece_24a = split(chafl_n1_piece_24a, bisect_by=Plane(origin=(-220, -83.404127464, 643.404127464), z_dir=(-1, 0, 0)), keep=Keep.TOP, mode=Mode.PRIVATE)
    with BuildSketch(Plane(origin=(-220, -90, 598.566340241), x_dir=(-0.9996219169112968, -0.027495876610586317, 0), z_dir=(0, 0, 1))) as chafl_n1_piece_24b_section:
        with BuildLine():
            Line((20.573463904, 0), (-1.130943098, -20.54235587))
            Line((-1.130943098, -20.54235587), (-1.530791864, -20.53135752))
            ThreePointArc((-1.530791864, -20.53135752), (-0.682584541, -10.267956593), (-0.399848767, 0.010998351))
            Line((-0.399848767, 0.010998351), (0.010998351, 0.399848767))
            ThreePointArc((0.010998351, 0.399848767), (10.289953294, 0.117112992), (20.584462254, 0.399848767))
            Line((20.584462254, 0.399848767), (20.573463904, 0))
        make_face()
    chafl_n1_piece_24b = extrude(amount=502.867319519, mode=Mode.PRIVATE)
    chafl_n1_piece_24b = split(chafl_n1_piece_24b, bisect_by=Plane(origin=(-226.595872536, -83.404127464, 650), z_dir=(0, 0, -1)), keep=Keep.TOP, mode=Mode.PRIVATE)
    chafl_n1_piece_24 = chafl_n1_piece_24a & chafl_n1_piece_24b
    add(chafl_n1_piece_24, mode=Mode.SUBTRACT)
    with BuildSketch(Plane(origin=(-220, 90, 650), x_dir=(0, 0.027495876610586282, -0.9996219169112968), z_dir=(1, 0, 0))) as chafl_n1_piece_25a_section:
        with BuildLine():
            Line((20.573463904, 0), (-1.130943098, -20.54235587))
            Line((-1.130943098, -20.54235587), (-1.530791864, -20.53135752))
            ThreePointArc((-1.530791864, -20.53135752), (-0.682584541, -10.267956593), (-0.399848767, 0.010998351))
            Line((-0.399848767, 0.010998351), (0.010998351, 0.399848767))
            ThreePointArc((0.010998351, 0.399848767), (10.289953294, 0.117112992), (20.584462254, 0.399848767))
            Line((20.584462254, 0.399848767), (20.573463904, 0))
        make_face()
    chafl_n1_piece_25a = extrude(amount=491.433659759, mode=Mode.PRIVATE)
    chafl_n1_piece_25a = split(chafl_n1_piece_25a, bisect_by=Plane(origin=(220, 83.404127464, 643.404127464), z_dir=(1, 0, 0)), keep=Keep.TOP, mode=Mode.PRIVATE)
    with BuildSketch(Plane(origin=(220, 90, 598.566340241), x_dir=(0.9996219169112968, 0.027495876610586317, 0), z_dir=(0, 0, 1))) as chafl_n1_piece_25b_section:
        with BuildLine():
            Line((20.573463904, 0), (-1.130943098, -20.54235587))
            Line((-1.130943098, -20.54235587), (-1.530791864, -20.53135752))
            ThreePointArc((-1.530791864, -20.53135752), (-0.682584541, -10.267956593), (-0.399848767, 0.010998351))
            Line((-0.399848767, 0.010998351), (0.010998351, 0.399848767))
            ThreePointArc((0.010998351, 0.399848767), (10.289953294, 0.117112992), (20.584462254, 0.399848767))
            Line((20.584462254, 0.399848767), (20.573463904, 0))
        make_face()
    chafl_n1_piece_25b = extrude(amount=502.867319519, mode=Mode.PRIVATE)
    chafl_n1_piece_25b = split(chafl_n1_piece_25b, bisect_by=Plane(origin=(226.595872536, 83.404127464, 650), z_dir=(0, 0, -1)), keep=Keep.TOP, mode=Mode.PRIVATE)
    chafl_n1_piece_25 = chafl_n1_piece_25a & chafl_n1_piece_25b
    add(chafl_n1_piece_25, mode=Mode.SUBTRACT)

    # Croquis5 → Cortar-Extruir1 (cut, through all)
    with BuildSketch(Plane(origin=(300, 0, 0), x_dir=(0, 0, -1), z_dir=(1, 0, 0))):
        with Locations((-950, 0)):
            Circle(CROQUIS5_R)
    extrude(amount=-CORTAR_EXTRUIR1_DEPTH, mode=Mode.SUBTRACT)


solid = part.part
